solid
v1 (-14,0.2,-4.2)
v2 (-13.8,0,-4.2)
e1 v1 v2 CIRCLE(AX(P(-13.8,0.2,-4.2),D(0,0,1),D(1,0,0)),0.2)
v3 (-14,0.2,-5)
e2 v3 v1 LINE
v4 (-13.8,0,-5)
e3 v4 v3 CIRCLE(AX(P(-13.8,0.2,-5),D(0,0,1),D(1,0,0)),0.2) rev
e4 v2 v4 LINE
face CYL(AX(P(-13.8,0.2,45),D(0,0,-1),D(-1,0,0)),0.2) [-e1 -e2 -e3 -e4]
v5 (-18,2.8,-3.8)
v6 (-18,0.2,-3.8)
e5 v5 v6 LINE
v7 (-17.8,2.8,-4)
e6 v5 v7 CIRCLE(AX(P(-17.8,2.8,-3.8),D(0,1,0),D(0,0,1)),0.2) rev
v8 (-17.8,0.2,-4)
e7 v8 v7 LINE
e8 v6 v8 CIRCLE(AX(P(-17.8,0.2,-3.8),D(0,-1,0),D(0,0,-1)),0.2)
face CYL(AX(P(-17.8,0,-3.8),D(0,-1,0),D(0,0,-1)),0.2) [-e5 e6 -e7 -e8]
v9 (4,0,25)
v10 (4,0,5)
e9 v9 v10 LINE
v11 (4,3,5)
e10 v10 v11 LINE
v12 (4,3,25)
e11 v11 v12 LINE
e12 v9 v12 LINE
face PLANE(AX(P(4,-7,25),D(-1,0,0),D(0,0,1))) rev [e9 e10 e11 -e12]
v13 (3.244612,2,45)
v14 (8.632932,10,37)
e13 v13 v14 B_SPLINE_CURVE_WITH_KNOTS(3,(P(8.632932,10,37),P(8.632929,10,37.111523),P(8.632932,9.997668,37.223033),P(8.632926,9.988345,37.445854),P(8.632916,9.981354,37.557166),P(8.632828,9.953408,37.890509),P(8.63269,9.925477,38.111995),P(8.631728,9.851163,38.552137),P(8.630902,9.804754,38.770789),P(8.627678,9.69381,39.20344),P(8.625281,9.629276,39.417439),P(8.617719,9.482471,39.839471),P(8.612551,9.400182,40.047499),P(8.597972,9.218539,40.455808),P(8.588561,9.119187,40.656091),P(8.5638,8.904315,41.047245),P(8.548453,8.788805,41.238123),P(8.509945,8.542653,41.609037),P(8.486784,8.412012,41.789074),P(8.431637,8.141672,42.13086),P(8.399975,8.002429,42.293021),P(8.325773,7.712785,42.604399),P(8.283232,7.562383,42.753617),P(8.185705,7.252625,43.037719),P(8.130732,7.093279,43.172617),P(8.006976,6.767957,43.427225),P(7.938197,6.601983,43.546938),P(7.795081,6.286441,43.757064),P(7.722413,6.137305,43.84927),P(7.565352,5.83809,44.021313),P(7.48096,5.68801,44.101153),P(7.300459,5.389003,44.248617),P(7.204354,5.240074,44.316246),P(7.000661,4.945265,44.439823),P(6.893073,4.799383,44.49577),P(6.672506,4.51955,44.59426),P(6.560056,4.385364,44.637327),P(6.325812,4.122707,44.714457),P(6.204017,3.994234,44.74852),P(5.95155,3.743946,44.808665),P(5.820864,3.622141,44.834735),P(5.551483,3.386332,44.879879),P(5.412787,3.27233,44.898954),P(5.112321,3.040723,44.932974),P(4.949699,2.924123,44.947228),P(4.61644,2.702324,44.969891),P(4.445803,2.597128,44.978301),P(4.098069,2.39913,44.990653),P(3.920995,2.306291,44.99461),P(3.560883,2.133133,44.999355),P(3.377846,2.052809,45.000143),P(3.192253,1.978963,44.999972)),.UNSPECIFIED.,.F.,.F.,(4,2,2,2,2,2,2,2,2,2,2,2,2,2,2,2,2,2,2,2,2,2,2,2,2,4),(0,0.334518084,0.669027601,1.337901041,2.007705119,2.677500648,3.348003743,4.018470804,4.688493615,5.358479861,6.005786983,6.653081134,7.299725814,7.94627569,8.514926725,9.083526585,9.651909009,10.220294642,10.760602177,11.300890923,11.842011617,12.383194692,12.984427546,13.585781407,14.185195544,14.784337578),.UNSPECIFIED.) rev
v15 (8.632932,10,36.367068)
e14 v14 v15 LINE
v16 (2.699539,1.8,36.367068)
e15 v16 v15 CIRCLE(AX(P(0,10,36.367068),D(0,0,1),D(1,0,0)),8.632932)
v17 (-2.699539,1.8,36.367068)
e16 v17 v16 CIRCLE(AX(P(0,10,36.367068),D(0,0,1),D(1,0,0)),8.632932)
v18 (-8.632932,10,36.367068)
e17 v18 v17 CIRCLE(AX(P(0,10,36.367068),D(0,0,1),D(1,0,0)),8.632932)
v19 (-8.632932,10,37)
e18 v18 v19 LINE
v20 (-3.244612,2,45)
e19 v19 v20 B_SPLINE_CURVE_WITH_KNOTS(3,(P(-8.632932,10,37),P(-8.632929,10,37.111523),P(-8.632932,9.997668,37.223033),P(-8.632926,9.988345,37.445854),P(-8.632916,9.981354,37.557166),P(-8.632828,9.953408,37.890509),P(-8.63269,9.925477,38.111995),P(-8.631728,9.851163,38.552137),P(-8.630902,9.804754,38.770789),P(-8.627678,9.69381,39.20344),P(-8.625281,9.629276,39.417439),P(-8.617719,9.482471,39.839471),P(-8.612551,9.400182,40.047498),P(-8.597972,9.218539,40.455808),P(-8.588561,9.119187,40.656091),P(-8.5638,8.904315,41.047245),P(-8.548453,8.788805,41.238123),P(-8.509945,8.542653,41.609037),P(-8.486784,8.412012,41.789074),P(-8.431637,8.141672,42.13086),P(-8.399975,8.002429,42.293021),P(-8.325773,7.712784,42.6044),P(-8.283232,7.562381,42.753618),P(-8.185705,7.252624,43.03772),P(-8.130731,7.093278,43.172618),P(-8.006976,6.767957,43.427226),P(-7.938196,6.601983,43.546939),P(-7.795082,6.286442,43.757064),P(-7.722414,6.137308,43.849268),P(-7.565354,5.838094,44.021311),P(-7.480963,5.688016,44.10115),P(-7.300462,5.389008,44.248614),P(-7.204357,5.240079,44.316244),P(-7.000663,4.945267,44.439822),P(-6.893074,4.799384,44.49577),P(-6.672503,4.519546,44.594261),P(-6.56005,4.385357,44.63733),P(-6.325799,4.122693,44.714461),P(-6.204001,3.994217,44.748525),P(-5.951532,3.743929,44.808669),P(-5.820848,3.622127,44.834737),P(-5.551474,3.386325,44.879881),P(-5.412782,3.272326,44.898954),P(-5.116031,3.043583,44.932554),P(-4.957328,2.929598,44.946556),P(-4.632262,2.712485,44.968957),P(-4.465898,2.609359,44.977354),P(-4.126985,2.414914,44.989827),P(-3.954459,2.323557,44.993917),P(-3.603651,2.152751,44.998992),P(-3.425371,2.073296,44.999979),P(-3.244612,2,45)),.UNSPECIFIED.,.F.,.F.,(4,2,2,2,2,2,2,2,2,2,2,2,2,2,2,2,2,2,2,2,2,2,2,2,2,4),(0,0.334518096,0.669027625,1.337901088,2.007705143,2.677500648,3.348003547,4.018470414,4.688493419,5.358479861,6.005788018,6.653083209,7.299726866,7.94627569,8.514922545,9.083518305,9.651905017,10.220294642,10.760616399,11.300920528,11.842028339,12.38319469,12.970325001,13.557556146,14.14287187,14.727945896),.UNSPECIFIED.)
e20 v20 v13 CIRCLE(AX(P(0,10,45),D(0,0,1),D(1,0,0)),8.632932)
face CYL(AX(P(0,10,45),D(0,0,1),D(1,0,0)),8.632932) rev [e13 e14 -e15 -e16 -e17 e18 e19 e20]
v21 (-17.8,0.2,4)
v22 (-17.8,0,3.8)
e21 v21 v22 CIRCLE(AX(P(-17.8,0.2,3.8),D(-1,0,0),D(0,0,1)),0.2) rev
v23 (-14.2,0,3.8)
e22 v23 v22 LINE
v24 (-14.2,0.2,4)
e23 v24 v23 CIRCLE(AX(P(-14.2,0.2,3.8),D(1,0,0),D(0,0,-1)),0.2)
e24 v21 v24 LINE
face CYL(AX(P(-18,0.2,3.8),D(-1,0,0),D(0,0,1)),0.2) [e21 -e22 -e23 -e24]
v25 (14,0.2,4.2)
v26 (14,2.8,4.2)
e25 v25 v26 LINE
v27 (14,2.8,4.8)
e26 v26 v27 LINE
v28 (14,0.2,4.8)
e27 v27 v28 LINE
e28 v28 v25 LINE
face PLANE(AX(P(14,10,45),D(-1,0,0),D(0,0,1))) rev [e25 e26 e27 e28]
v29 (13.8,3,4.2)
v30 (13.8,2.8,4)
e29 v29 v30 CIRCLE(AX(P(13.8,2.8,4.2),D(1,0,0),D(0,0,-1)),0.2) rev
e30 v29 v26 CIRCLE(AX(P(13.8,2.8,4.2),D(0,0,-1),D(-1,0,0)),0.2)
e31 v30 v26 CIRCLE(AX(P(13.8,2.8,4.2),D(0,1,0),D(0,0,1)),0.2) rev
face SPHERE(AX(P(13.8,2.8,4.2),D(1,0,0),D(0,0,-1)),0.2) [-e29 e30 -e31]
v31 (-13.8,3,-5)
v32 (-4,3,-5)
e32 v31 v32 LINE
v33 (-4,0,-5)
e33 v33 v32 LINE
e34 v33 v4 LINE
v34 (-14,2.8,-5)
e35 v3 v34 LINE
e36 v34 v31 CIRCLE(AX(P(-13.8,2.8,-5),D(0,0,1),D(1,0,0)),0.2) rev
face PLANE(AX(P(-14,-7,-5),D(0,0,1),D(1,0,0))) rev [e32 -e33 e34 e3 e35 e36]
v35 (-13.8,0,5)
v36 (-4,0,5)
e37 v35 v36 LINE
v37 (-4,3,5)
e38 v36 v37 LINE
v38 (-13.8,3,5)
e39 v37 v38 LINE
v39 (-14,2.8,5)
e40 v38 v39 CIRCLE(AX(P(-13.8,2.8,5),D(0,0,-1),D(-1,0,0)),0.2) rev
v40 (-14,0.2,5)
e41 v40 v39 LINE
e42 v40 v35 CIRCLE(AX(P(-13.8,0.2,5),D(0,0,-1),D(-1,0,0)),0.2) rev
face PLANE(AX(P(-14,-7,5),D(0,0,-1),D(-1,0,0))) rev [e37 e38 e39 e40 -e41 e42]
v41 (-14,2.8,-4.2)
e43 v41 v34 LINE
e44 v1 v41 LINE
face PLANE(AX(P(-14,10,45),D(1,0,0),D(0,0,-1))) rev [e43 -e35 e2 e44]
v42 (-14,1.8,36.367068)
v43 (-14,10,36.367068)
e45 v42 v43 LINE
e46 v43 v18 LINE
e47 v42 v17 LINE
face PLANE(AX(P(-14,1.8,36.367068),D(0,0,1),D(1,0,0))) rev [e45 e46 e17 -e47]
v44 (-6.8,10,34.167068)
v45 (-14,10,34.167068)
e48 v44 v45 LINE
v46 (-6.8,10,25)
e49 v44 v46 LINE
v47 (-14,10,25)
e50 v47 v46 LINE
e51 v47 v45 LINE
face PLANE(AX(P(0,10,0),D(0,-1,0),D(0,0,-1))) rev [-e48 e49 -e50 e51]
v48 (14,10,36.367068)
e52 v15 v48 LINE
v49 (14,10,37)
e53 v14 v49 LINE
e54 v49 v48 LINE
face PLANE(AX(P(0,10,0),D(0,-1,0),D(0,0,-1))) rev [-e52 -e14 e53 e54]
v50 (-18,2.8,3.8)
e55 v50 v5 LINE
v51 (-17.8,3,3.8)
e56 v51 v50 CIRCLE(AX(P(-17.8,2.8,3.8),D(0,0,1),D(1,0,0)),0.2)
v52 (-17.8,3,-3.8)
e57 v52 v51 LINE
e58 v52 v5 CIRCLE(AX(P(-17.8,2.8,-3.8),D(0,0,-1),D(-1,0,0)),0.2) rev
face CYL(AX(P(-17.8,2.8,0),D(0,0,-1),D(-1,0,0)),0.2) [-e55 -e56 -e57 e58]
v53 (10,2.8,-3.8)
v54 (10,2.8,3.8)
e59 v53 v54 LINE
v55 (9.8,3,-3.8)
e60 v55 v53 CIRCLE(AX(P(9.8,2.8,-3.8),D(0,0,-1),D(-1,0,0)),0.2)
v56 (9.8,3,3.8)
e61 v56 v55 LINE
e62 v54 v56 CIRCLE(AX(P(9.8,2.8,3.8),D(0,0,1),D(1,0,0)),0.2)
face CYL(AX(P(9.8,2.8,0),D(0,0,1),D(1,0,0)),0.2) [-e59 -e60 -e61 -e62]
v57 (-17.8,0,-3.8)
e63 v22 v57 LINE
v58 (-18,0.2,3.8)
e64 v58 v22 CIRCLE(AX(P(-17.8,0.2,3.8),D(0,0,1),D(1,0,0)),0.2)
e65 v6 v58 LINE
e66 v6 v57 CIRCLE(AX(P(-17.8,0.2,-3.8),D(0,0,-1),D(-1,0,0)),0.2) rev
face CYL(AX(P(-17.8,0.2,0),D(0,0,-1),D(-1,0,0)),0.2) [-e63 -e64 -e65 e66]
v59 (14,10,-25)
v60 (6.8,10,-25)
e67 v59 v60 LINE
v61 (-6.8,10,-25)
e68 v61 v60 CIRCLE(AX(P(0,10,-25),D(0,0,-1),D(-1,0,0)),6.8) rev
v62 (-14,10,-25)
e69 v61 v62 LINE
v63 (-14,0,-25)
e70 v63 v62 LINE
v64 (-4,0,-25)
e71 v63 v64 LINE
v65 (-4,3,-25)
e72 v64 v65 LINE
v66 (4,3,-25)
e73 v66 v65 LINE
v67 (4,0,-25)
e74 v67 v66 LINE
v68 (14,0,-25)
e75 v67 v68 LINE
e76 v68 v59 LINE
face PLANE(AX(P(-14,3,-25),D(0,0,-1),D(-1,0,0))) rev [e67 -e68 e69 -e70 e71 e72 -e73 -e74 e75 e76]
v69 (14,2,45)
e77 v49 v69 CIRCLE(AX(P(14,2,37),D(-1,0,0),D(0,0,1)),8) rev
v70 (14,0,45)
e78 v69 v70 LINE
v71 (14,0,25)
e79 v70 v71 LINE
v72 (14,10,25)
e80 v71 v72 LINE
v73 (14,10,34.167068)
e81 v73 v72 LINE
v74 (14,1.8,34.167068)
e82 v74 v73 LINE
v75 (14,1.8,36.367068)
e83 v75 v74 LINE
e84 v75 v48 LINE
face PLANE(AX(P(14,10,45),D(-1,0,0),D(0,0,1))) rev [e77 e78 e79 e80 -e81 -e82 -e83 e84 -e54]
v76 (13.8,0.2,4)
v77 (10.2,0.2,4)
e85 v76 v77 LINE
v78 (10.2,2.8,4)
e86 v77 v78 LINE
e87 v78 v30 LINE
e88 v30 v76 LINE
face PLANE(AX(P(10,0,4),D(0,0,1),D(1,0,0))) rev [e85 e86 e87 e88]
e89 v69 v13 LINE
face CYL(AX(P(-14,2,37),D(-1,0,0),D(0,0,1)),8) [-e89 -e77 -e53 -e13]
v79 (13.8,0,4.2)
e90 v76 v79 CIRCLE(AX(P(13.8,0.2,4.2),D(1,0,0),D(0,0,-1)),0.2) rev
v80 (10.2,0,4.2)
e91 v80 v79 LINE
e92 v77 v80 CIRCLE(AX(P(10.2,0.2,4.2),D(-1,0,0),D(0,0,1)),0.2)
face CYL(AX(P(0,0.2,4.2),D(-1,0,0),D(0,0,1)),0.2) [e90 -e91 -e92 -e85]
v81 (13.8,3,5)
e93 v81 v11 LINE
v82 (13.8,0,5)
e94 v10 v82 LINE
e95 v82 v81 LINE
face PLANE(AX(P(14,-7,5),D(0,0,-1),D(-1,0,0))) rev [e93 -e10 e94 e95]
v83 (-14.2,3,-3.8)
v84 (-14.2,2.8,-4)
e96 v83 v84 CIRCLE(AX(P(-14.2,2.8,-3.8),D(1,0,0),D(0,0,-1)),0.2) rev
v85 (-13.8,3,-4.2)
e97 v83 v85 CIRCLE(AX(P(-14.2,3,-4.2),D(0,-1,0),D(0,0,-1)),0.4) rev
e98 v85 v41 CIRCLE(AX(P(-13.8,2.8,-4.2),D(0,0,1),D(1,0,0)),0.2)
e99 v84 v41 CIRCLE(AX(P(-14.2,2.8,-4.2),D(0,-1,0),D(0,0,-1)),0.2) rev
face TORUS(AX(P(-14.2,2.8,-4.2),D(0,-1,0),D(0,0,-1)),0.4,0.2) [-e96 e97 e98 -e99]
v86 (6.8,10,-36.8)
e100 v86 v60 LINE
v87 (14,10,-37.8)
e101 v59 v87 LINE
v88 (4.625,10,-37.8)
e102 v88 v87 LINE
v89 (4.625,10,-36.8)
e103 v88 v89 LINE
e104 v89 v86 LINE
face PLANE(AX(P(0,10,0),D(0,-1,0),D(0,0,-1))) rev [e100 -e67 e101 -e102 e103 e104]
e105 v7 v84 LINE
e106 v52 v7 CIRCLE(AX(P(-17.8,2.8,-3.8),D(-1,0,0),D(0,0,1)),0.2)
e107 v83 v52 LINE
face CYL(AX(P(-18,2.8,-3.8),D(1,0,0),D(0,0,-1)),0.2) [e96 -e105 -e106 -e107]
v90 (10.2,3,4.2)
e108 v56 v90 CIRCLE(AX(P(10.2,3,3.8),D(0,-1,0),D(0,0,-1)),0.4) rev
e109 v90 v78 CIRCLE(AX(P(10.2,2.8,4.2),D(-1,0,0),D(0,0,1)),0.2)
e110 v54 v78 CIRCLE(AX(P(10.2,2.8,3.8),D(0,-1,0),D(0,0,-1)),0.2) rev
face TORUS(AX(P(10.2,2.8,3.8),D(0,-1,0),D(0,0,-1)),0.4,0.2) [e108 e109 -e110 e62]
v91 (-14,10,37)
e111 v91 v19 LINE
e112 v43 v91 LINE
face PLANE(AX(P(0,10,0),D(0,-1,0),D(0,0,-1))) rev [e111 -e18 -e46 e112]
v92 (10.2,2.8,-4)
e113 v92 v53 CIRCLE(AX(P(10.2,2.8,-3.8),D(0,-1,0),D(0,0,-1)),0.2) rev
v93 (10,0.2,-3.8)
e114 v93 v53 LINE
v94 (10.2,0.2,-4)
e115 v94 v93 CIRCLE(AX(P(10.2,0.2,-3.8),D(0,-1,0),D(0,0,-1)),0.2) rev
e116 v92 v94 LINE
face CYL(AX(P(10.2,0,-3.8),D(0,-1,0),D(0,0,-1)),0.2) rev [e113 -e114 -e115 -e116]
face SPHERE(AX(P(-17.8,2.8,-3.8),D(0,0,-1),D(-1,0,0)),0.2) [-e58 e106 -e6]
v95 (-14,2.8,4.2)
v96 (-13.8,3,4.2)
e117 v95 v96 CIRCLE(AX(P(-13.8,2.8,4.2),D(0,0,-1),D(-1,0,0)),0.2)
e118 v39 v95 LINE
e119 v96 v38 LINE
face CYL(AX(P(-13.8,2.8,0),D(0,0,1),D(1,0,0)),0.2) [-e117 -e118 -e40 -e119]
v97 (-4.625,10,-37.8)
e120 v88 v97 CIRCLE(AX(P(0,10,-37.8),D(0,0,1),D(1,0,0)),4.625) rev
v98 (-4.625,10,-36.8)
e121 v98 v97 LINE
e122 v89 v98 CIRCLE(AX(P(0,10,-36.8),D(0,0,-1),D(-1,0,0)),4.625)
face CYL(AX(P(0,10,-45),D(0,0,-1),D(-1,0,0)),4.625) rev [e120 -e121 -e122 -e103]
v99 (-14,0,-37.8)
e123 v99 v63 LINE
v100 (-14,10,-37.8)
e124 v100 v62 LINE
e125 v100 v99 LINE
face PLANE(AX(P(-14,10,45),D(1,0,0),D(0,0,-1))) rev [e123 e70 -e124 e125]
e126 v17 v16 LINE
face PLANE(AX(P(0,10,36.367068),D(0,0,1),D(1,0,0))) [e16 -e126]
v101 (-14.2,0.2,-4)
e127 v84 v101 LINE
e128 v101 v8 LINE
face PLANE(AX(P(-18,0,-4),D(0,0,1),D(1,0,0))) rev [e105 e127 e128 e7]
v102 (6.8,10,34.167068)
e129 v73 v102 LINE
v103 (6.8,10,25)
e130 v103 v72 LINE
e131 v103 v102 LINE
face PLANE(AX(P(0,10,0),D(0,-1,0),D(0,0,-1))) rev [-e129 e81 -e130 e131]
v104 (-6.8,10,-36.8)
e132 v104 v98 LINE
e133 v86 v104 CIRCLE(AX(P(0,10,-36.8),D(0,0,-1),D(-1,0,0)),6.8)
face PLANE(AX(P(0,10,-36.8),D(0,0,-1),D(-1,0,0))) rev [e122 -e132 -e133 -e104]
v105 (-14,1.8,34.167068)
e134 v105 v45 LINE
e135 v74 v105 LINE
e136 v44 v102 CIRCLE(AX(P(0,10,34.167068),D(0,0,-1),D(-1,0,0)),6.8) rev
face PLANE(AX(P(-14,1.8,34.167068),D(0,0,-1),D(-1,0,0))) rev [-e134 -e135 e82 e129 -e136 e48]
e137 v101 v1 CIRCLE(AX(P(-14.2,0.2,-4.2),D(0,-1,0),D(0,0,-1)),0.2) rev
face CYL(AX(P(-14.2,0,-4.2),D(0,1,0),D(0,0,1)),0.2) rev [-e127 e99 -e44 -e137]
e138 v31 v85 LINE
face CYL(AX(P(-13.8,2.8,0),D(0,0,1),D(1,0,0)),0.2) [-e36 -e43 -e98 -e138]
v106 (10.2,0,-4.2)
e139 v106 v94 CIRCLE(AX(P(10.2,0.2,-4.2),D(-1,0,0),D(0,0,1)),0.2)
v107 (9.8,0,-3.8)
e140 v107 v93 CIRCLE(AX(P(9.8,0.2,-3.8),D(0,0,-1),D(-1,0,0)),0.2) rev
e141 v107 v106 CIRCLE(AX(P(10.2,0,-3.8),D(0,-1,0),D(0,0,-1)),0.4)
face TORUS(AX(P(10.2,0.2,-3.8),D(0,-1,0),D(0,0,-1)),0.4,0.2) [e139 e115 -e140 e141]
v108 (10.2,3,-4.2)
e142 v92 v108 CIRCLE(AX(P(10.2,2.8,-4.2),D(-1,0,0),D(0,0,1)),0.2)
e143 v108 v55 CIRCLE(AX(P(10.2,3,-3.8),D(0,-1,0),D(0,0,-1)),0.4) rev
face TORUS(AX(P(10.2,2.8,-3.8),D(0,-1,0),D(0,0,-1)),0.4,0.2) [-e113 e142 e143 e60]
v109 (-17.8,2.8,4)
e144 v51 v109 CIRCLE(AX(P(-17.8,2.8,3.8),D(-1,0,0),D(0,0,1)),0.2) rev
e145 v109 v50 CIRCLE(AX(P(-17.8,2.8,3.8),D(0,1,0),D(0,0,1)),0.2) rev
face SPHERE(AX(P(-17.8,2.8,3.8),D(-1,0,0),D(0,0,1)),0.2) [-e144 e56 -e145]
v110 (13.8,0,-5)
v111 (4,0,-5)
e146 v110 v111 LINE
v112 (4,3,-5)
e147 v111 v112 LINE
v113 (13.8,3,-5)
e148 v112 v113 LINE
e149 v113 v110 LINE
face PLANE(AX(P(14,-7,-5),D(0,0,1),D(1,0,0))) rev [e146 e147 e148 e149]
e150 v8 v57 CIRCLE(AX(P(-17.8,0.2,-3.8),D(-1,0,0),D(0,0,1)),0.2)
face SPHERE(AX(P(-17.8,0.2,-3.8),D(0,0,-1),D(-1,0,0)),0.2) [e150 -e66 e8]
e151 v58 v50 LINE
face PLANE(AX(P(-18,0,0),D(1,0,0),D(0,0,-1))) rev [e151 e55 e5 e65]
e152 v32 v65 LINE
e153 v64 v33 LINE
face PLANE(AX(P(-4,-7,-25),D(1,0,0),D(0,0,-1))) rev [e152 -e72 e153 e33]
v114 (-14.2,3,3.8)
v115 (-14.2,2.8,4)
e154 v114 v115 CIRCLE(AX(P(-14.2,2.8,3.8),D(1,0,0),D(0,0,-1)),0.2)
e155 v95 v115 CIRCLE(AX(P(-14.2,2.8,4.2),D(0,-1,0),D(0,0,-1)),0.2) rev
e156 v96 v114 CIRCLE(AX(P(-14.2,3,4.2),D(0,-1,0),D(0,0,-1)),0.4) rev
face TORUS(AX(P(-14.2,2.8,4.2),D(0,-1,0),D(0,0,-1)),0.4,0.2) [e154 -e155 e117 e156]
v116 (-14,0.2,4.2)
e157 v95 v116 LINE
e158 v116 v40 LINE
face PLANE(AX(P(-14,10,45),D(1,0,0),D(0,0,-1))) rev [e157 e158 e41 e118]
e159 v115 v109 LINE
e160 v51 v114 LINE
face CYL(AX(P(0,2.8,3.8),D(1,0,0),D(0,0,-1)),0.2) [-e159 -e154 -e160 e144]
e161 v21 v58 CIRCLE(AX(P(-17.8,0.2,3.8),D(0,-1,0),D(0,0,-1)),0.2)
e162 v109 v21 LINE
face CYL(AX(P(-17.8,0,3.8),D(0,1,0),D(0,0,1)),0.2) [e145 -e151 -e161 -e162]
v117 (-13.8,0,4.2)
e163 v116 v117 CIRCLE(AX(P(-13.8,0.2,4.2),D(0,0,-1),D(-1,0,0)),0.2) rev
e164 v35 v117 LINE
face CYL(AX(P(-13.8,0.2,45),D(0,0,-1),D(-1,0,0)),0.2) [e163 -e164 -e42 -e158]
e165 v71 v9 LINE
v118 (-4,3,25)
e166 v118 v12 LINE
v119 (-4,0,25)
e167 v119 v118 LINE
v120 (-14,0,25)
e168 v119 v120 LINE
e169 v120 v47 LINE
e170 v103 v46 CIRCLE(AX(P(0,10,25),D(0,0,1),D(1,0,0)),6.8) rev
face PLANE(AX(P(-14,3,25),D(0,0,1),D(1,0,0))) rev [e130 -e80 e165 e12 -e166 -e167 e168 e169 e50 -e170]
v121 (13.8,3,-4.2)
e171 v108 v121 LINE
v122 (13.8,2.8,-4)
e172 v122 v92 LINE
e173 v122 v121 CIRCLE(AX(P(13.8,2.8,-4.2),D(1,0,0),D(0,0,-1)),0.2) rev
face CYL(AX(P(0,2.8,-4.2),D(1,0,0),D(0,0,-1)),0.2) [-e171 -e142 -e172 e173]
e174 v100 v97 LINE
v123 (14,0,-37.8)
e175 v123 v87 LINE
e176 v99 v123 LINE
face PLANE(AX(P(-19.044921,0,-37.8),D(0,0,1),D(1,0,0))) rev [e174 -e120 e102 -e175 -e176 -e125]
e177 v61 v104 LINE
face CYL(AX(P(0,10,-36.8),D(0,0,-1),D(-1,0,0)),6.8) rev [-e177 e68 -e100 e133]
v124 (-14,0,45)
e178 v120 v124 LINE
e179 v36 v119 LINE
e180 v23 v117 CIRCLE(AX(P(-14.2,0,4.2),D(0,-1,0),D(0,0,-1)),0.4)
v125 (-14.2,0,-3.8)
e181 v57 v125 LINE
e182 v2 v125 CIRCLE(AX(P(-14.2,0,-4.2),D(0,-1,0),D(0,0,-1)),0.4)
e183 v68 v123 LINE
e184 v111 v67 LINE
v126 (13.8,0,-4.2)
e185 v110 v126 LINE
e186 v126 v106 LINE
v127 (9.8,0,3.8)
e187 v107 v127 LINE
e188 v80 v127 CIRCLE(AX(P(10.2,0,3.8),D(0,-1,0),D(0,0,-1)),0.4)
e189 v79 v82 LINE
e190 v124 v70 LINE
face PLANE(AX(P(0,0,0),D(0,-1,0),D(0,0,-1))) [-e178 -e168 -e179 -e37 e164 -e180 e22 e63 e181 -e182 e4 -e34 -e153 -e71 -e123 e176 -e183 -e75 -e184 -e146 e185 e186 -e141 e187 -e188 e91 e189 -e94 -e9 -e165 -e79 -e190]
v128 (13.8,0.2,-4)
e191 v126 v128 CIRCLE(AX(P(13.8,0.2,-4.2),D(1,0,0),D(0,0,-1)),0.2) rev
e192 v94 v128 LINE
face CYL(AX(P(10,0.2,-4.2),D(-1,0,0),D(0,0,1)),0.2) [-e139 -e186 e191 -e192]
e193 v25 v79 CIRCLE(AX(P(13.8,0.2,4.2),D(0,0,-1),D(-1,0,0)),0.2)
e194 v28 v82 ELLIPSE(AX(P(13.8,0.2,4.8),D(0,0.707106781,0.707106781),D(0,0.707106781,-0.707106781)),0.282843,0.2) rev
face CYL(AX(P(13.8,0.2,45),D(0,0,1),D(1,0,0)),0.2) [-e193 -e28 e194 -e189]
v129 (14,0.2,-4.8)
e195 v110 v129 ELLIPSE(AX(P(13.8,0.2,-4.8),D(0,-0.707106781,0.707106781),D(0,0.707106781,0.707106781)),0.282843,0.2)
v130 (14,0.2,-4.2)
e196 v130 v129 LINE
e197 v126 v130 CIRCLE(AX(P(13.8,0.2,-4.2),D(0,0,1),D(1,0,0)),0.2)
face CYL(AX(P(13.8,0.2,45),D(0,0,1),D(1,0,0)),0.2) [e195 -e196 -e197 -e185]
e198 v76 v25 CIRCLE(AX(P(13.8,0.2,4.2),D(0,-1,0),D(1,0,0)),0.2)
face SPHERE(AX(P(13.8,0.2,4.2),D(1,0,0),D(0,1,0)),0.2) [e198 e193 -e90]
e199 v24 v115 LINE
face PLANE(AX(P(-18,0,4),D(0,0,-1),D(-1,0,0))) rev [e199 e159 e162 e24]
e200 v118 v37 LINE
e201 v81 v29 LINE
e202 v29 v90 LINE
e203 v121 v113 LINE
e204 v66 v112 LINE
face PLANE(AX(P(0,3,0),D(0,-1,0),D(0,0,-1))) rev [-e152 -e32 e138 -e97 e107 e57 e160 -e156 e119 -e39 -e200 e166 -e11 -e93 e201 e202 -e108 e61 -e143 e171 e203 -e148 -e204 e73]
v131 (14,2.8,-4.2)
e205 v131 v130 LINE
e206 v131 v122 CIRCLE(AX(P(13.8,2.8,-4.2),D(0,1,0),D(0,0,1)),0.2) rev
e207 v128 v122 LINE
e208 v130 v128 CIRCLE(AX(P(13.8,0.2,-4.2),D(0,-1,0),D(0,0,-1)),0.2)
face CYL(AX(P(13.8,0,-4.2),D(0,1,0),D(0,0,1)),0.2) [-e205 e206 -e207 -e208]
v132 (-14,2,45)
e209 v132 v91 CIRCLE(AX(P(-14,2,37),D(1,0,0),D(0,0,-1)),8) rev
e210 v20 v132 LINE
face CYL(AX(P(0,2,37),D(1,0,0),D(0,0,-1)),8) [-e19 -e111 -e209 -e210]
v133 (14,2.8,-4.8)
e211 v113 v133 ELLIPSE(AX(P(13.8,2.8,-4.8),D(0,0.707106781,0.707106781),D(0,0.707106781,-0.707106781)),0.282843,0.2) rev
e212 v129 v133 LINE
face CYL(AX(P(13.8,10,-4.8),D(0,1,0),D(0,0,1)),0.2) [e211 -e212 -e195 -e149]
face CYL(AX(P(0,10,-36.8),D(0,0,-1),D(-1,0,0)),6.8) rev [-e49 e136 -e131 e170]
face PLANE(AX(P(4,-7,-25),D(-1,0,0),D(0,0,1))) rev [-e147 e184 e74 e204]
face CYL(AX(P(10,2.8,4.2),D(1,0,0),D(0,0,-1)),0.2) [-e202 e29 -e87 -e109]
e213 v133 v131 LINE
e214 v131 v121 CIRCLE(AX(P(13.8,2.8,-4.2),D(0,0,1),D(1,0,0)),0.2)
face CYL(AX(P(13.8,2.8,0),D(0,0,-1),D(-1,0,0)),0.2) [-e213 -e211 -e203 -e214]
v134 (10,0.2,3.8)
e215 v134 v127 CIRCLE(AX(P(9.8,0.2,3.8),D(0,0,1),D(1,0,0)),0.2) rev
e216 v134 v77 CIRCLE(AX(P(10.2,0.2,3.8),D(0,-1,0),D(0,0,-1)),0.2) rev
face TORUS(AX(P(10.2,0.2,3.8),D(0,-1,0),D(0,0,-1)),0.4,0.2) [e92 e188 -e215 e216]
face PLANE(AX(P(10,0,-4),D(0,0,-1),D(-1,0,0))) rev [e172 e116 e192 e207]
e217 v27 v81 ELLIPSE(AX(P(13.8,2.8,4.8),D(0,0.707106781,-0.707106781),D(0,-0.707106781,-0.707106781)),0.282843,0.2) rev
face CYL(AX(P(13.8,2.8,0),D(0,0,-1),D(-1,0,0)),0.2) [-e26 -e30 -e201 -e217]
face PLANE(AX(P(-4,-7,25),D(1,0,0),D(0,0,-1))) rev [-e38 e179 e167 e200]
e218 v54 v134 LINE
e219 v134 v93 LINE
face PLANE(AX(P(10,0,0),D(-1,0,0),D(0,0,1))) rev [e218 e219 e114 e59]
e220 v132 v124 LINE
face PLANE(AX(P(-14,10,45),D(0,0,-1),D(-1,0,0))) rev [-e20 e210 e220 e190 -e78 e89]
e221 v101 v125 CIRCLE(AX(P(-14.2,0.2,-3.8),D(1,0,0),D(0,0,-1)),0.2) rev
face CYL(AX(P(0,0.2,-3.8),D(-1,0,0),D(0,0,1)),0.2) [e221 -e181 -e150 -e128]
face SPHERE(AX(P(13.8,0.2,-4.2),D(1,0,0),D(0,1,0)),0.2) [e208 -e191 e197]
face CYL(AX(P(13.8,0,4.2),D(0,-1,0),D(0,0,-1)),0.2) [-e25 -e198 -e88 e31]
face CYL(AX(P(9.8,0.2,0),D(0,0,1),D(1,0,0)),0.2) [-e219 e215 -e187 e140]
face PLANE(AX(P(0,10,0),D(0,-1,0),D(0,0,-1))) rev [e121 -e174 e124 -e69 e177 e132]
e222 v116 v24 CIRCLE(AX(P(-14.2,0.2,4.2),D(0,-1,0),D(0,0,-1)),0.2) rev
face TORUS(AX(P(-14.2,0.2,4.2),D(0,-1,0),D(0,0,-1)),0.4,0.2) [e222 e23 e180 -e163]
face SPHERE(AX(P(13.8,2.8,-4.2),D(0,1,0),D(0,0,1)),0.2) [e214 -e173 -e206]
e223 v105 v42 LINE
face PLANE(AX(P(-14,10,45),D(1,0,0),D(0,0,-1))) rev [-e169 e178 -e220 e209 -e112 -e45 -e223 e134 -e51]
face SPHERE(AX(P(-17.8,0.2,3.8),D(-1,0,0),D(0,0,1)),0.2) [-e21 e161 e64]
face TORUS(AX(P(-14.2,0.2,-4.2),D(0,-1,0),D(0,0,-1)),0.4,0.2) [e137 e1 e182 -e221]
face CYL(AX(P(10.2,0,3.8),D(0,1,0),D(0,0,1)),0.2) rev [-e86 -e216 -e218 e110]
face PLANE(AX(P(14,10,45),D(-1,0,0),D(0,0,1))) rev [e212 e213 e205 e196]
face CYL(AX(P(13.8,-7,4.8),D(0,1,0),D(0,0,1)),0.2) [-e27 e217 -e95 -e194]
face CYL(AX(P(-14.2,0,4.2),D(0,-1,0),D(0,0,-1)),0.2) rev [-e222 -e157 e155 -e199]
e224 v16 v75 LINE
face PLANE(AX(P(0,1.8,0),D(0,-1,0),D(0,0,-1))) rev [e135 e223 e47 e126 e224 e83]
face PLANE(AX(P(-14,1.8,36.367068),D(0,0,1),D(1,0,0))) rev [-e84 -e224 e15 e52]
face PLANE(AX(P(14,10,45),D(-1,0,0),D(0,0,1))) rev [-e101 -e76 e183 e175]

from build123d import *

# Parameters (mm, degrees)
SKETCH1_W                   = 28
SKETCH1_H                   = 90
BOSS_EXTRUDE1_DEPTH         = 10
SKETCH4_W                   = 6.8
SKETCH4_H                   = 71
SKETCH5_W                   = 28
SKETCH5_H                   = 2.2
FLANGE_SLOT_DEPTH           = 8.2
SKETCH6_W                   = 8.632931683
SKETCH6_H                   = 8.632931683
SKETCH3_W                   = 4.625
SKETCH3_H                   = 10.2
CUT_EXTRUDE4_DEPTH          = 49.176757882
CUT_EXTRUDE4_DEPTH_BACK     = 49.176757882
SKETCH17_W                  = 38.089842412
SKETCH17_H                  = 14.4
SKETCH18_W                  = 28
SKETCH18_H                  = 50
SYRINGE_BAY_DEPTH           = 7
SYRINGE_PLUNGER_LEFT_R      = 8
SYRINGE_START               = -15
SYRINGE_PLUNGER_RIGHT_DEPTH = 23.632931783
SKETCH19_W                  = 10
SKETCH19_H                  = 20
CUT_EXTRUDE5_DEPTH          = 10
SKETCH24_W                  = 8
SKETCH24_H                  = 3
BOSS_EXTRUDE3_DEPTH         = 4
SKETCH25_W                  = 8
SKETCH25_H                  = 3
CUT_EXTRUDE6_DEPTH          = 4
FILLET1_R                   = 0.2
FILLET2_R                   = 0.2


with BuildPart() as part:
    # Sketch1 → Boss-Extrude1 (new body)
    with BuildSketch(Plane(origin=(0, 0, 0), x_dir=(1, 0, 0), z_dir=(0, 1, 0))):
        Rectangle(SKETCH1_W, SKETCH1_H)
    extrude(amount=BOSS_EXTRUDE1_DEPTH)

    # Sketch4 → Syringe Body slot (revolve, cut)
    with BuildSketch(Plane(origin=(0, 10, 0), x_dir=(1, 0, 0), z_dir=(0, 1, 0))):
        with Locations((-3.4, 1.3)):
            Rectangle(SKETCH4_W, SKETCH4_H)
    revolve(axis=Axis((0, 10, -36.8), (0, 0, 1)), mode=Mode.SUBTRACT)

    # Sketch5 → Flange Slot (cut)
    with BuildSketch(Plane(origin=(0, 10, 0), x_dir=(1, 0, 0), z_dir=(0, 1, 0))):
        with Locations((0, -35.267068317)):
            Rectangle(SKETCH5_W, SKETCH5_H)
    extrude(amount=-FLANGE_SLOT_DEPTH, mode=Mode.SUBTRACT)

    # Sketch6 → Plunger Slot (revolve, cut)
    with BuildSketch(Plane(origin=(0, 10, 0), x_dir=(1, 0, 0), z_dir=(0, 1, 0))):
        with Locations((-4.316465842, -40.683534159)):
            Rectangle(SKETCH6_W, SKETCH6_H)
    revolve(axis=Axis((0, 10, 45), (0, 0, -1)), mode=Mode.SUBTRACT)

    # Sketch3 → Barrell Slot (revolve, cut)
    with BuildSketch(Plane(origin=(0, 10, 0), x_dir=(1, 0, 0), z_dir=(0, 1, 0))):
        with Locations((-2.3125, 39.9)):
            Rectangle(SKETCH3_W, SKETCH3_H)
    revolve(axis=Axis((0, 10, -45), (0, 0, 1)), mode=Mode.SUBTRACT)

    # Sketch17 → Cut-Extrude4 (cut, two sides: drawn at the far end of the back side and taken through both)
    with BuildSketch(Plane(origin=(0, 10, 0), x_dir=(1, 0, 0), z_dir=(0, 1, 0)).offset(-CUT_EXTRUDE4_DEPTH_BACK)):
        with Locations((0, 45)):
            Rectangle(SKETCH17_W, SKETCH17_H)
    extrude(amount=CUT_EXTRUDE4_DEPTH + CUT_EXTRUDE4_DEPTH_BACK, mode=Mode.SUBTRACT)

    # Sketch18 → Syringe Bay (cut)
    with BuildSketch(Plane(origin=(0, 10, 0), x_dir=(1, 0, 0), z_dir=(0, 1, 0))):
        Rectangle(SKETCH18_W, SKETCH18_H)
    extrude(amount=-SYRINGE_BAY_DEPTH, mode=Mode.SUBTRACT)

    # Syringe plunger left
    syringe_plunger_left_edges = [part.edges().sort_by_distance(p)[0] for p in [
        (11.316465842, 10, 45),
    ]]
    fillet(syringe_plunger_left_edges, radius=SYRINGE_PLUNGER_LEFT_R)

    # Syringe plunger right: read off the stored shape, not the designer's step
    # Syringe plunger right outline → Syringe plunger right (cut)
    with BuildSketch(Plane.YZ.offset(SYRINGE_START)):
        with BuildLine():
            ThreePointArc((2, 45), (7.656854249, 42.656854249), (10, 37))
            Line((10, 37), (10, 45))
            Line((10, 45), (2, 45))
        make_face()
    extrude(amount=SYRINGE_PLUNGER_RIGHT_DEPTH, mode=Mode.SUBTRACT)

    # Sketch19 → Cut-Extrude5 (cut)
    with BuildSketch(Plane(origin=(0, 3, 0), x_dir=(1, 0, 0), z_dir=(0, 1, 0))):
        with Locations((-9, 15)):
            Rectangle(SKETCH19_W, SKETCH19_H)
        with Locations((-9, -15)):
            Rectangle(SKETCH19_W, SKETCH19_H)
        with Locations((9, -15)):
            Rectangle(SKETCH19_W, SKETCH19_H)
        with Locations((9, 15)):
            Rectangle(SKETCH19_W, SKETCH19_H)
    extrude(amount=-CUT_EXTRUDE5_DEPTH, mode=Mode.SUBTRACT)

    # Sketch24 → Boss-Extrude3 (add)
    with BuildSketch(Plane.ZY.offset(14)):
        with Locations((0, 1.5)):
            Rectangle(SKETCH24_W, SKETCH24_H)
    extrude(amount=BOSS_EXTRUDE3_DEPTH)

    # Sketch25 → Cut-Extrude6 (cut)
    with BuildSketch(Plane(origin=(14, 0, 0), x_dir=(0, 0, -1), z_dir=(1, 0, 0))):
        with Locations((0, 1.5)):
            Rectangle(SKETCH25_W, SKETCH25_H)
    extrude(amount=-CUT_EXTRUDE6_DEPTH, mode=Mode.SUBTRACT)

    # Fillet1
    fillet1_edges = [part.edges().sort_by_distance(p)[0] for p in [
        (14, 0, 4.5),
        (14, 3, 4.5),
        (14, 1.5, -5),
        (14, 1.5, 5),
        (14, 0, -4.5),
        (14, 3, -4.5),
        (10, 1.5, -4),
        (12, 3, -4),
        (10, 0, 0),
        (12, 0, -4),
        (10, 1.5, 4),
        (12, 0, 4),
        (10, 3, 0),
        (12, 3, 4),
        (14, 1.5, -4),
        (14, 1.5, 4),
    ]]
    fillet(fillet1_edges, radius=FILLET1_R)

    # Fillet2
    fillet2_edges = [part.edges().sort_by_distance(p)[0] for p in [
        (-14, 0, -4.5),
        (-14, 3, -4.5),
        (-14, 3, 4.5),
        (-14, 0, 4.5),
        (-14, 1.5, 4),
        (-16, 0, 4),
        (-16, 3, 4),
        (-14, 1.5, -4),
        (-16, 3, -4),
        (-16, 0, -4),
        (-18, 1.5, 4),
        (-18, 3, 0),
        (-18, 1.5, -4),
        (-18, 0, 0),
    ]]
    fillet(fillet2_edges, radius=FILLET2_R)


solid = part.part
